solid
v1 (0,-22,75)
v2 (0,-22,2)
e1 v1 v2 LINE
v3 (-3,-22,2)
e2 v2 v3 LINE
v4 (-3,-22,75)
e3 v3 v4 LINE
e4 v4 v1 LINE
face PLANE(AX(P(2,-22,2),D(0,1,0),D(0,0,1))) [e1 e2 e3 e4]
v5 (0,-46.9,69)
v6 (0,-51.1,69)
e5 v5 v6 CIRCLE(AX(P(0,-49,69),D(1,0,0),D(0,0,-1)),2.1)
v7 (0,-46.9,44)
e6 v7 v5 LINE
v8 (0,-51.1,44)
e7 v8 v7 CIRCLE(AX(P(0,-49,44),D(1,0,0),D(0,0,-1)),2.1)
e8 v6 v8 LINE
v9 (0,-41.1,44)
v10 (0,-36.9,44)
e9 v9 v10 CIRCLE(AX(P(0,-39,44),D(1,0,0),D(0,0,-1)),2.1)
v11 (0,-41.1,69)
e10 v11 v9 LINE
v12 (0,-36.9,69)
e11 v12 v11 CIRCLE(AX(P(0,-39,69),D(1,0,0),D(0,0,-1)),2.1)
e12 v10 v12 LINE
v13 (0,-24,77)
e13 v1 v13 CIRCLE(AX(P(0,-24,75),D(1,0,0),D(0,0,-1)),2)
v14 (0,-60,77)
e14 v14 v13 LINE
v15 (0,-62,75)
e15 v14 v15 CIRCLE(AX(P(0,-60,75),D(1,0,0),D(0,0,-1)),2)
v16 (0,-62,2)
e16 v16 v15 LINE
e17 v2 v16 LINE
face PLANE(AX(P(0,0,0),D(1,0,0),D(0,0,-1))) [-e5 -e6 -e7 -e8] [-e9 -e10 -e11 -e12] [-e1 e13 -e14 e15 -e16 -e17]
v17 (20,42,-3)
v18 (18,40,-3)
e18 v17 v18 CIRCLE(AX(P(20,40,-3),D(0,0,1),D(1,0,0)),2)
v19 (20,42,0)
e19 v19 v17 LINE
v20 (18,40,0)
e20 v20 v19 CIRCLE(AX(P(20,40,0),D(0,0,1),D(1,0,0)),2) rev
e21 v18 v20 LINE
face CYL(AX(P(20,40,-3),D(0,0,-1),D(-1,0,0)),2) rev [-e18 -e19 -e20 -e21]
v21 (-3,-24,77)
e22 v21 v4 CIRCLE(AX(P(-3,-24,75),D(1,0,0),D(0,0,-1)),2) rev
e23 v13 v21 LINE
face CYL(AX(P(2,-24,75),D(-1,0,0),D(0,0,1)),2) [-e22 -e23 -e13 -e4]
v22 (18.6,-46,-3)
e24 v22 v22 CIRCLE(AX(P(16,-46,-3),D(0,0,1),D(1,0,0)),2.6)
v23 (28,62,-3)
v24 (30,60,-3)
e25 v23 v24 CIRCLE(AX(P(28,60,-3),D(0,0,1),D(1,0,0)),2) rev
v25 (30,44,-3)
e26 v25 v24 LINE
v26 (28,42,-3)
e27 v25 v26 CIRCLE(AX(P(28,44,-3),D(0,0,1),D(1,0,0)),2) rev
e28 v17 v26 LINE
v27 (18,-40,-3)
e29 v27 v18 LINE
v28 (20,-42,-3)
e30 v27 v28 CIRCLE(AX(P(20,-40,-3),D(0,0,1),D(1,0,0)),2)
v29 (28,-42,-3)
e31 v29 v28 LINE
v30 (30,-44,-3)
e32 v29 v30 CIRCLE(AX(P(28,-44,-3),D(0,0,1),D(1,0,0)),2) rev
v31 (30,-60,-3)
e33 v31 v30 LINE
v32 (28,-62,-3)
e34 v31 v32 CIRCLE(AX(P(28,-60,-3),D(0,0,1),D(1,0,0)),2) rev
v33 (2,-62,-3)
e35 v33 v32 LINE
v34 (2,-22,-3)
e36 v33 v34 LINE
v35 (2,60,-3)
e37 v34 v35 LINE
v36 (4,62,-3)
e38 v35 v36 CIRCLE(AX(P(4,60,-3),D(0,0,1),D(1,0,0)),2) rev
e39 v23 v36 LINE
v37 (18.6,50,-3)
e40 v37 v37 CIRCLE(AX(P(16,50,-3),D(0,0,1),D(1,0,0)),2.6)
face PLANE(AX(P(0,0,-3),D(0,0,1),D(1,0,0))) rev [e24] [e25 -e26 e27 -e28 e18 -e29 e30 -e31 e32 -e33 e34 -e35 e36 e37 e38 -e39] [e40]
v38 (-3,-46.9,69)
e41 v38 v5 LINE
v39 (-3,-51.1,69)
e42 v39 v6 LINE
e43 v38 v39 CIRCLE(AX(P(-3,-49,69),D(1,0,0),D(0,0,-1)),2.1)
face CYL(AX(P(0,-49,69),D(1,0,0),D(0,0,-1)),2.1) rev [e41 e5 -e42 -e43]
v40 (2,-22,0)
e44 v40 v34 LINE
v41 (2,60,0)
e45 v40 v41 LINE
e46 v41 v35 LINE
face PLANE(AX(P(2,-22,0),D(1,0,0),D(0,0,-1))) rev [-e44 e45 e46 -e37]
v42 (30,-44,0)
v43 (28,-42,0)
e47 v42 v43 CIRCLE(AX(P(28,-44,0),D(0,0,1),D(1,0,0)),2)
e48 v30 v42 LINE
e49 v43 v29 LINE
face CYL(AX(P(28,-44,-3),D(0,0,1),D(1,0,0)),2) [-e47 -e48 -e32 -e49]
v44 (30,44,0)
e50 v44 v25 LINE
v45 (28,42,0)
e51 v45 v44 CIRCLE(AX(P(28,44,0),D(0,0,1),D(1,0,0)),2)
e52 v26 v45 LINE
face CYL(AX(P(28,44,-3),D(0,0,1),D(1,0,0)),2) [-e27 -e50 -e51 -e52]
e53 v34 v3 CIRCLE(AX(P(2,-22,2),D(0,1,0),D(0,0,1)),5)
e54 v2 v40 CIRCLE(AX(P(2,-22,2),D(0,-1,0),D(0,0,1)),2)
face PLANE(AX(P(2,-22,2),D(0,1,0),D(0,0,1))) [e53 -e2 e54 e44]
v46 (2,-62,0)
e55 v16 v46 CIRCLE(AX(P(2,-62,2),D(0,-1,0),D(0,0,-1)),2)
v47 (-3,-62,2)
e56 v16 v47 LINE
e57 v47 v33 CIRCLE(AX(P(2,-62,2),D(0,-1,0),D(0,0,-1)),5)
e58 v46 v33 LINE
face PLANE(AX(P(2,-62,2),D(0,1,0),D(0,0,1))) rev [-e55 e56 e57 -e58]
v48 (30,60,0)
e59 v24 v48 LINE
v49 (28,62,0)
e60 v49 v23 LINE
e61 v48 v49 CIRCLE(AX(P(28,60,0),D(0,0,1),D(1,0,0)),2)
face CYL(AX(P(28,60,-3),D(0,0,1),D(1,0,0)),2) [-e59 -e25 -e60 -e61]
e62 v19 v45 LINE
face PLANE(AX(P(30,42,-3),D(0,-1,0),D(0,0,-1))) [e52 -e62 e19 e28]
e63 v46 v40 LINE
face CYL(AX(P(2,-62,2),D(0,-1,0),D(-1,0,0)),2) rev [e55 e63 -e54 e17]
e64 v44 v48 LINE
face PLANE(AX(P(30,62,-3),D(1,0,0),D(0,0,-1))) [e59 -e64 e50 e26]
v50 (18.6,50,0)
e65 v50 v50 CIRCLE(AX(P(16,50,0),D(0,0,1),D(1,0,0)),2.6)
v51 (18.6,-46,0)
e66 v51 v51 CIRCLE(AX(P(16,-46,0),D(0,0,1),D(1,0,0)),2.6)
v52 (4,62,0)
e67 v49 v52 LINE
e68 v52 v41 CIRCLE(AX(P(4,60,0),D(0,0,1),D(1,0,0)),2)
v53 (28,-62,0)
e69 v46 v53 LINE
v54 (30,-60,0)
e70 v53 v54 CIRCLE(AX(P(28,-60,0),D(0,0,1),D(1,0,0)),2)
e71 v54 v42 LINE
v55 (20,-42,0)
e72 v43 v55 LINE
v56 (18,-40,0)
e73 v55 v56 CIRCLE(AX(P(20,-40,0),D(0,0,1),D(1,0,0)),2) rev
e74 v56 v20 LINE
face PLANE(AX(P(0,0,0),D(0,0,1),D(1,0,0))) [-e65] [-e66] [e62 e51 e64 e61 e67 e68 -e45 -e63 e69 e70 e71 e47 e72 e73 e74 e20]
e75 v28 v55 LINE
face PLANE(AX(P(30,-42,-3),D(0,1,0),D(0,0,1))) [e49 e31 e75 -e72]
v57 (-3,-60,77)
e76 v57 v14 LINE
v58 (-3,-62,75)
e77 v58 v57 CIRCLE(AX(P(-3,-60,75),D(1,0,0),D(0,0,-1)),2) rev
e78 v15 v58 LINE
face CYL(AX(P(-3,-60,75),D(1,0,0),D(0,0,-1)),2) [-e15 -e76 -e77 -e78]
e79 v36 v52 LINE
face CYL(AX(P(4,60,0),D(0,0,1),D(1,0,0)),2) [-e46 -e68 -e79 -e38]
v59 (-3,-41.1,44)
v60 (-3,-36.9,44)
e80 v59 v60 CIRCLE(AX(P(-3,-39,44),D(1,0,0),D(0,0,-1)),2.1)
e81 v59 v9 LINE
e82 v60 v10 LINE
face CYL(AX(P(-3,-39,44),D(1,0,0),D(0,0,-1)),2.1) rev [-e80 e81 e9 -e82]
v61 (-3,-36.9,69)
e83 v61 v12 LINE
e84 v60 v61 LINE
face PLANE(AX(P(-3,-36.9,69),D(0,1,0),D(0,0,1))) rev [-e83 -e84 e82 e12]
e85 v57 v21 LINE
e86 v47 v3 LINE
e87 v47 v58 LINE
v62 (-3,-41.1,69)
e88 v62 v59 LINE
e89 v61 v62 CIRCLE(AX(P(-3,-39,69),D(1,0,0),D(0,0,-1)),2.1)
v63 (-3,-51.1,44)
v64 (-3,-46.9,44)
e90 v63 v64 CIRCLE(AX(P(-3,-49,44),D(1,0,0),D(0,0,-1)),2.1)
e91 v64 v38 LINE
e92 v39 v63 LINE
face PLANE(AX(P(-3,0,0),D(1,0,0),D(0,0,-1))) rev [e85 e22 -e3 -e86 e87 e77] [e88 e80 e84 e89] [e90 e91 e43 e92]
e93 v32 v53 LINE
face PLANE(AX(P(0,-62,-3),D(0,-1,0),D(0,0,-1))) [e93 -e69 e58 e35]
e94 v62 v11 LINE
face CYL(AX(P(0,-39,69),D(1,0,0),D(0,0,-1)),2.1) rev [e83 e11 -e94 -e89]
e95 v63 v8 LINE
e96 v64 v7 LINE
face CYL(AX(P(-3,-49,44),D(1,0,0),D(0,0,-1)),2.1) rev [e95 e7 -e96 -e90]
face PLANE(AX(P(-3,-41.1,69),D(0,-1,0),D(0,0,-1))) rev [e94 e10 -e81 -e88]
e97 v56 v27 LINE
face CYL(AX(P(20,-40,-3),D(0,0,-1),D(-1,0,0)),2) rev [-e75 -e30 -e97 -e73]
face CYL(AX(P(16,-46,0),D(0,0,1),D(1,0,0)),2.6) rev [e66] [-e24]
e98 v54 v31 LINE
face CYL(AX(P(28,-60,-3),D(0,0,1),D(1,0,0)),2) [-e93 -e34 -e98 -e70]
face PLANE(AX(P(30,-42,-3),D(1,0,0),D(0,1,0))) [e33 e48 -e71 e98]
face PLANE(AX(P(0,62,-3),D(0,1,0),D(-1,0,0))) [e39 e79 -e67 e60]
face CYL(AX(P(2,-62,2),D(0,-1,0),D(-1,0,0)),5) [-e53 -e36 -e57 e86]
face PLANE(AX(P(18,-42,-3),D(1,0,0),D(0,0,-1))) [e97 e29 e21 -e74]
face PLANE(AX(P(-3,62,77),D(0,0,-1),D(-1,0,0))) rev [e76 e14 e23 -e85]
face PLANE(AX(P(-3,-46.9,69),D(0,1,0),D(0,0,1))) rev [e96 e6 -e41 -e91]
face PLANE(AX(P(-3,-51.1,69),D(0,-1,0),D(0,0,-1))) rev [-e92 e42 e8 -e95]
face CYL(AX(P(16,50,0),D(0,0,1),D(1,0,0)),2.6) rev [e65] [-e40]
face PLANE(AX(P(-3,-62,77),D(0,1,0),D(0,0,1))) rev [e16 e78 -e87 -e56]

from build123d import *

# Parameters (mm, degrees)
ODGI_CIE_BAZOWE1_DEPTH             = 3
ODGI_CIE_KRAW_DZI1_STRIP_W         = 16
ODGI_CIE_KRAW_DZI1_STRIP_H         = 3
ODGI_CIE_KRAW_DZI1_STRIP_CUT_DEPTH = 124
ODGI_CIE_KRAW_DZI1_DEPTH           = 124
WYTNIJ_WYCI_GNI_CIE1_DEPTH         = 84
OTW_R_5_2_5_2_1_D                  = 5.2
OTW_R_4_2_4_2_1_D                  = 4.2
WYTNIJ_WYCI_GNI_CIE2_DEPTH         = 104.310212467
ZAOKR_GLENIE1_R                    = 2


# Sheet-metal steps are written as plain solids
with BuildPart() as part:
    # Szkic1 → Odgięcie bazowe1 (new body)
    with BuildSketch(Plane.XY):
        Polygon((30, -42), (30, -62), (0, -62), (0, 62), (30, 62), (30, 42), (18, 42), (18, -42), align=None)
    extrude(amount=-ODGI_CIE_BAZOWE1_DEPTH)

    # Odgięcie krawędzi1 strip (across the edge) → Odgięcie krawędzi1 strip cut (cut)
    with BuildSketch(Plane.XZ.offset(-62)):
        with Locations((-6, -1.5)):
            Rectangle(ODGI_CIE_KRAW_DZI1_STRIP_W, ODGI_CIE_KRAW_DZI1_STRIP_H)
    extrude(amount=ODGI_CIE_KRAW_DZI1_STRIP_CUT_DEPTH, mode=Mode.SUBTRACT)

    # Odgięcie krawędzi1 section (across the edge) → Odgięcie krawędzi1 (add)
    with BuildSketch(Plane.XZ.offset(-62)):
        with BuildLine():
            Line((-3, 2), (-3, 77))
            Line((-3, 77), (0, 77))
            Line((0, 77), (0, 2))
            ThreePointArc((0, 2), (0.585786438, 0.585786438), (2, 0))
            Line((2, 0), (2, -3))
            ThreePointArc((2, -3), (-1.535533906, -1.535533906), (-3, 2))
        make_face()
    extrude(amount=ODGI_CIE_KRAW_DZI1_DEPTH)

    # Szkic10 → Wytnij-wyciągnięcie1 (cut)
    with BuildSketch(Plane(origin=(0, 62, 0), x_dir=(1, 0, 0), z_dir=(0, 1, 0))):
        with BuildLine():
            Line((2, 0), (2, 3))
            ThreePointArc((2, 3), (-1.535533906, 1.535533906), (-3, -2))
            Line((-3, -2), (-3, -77))
            Line((-3, -77), (0, -77))
            Line((0, -77), (0, -2))
            ThreePointArc((0, -2), (0.585786438, -0.585786438), (2, 0))
        make_face()
    extrude(amount=-WYTNIJ_WYCI_GNI_CIE1_DEPTH, mode=Mode.SUBTRACT)

    # Otwór Ø5.2 (5.2)1 (through all)
    with Locations(Plane(origin=(16, -46, 0), x_dir=(1, 0, 0), z_dir=(0, 0, 1))):
        with Locations((0, 0), (0, 96)):
            Hole(OTW_R_5_2_5_2_1_D / 2)

    # Otwór Ø4.2 (4.2)1 (through all)
    with Locations(Plane(origin=(0, -49, 69), x_dir=(0, 0, 1), z_dir=(1, 0, 0))):
        with Locations((0, 0), (0, -10)):
            Hole(OTW_R_4_2_4_2_1_D / 2)

    # Szkic14 → Wytnij-wyciągnięcie2 (cut, through all)
    with BuildSketch(Plane(origin=(0, 0, 0), x_dir=(0, 0, -1), z_dir=(1, 0, 0))):
        with BuildLine():
            Line((-69, -46.9), (-44, -46.9))
            ThreePointArc((-44, -46.9), (-41.9, -49), (-44, -51.1))
            Line((-44, -51.1), (-69, -51.1))
            ThreePointArc((-69, -51.1), (-71.1, -49), (-69, -46.9))
        make_face()
        with BuildLine():
            Line((-69, -36.9), (-44, -36.9))
            ThreePointArc((-44, -36.9), (-41.9, -39), (-44, -41.1))
            Line((-44, -41.1), (-69, -41.1))
            ThreePointArc((-69, -41.1), (-71.1, -39), (-69, -36.9))
        make_face()
    extrude(amount=-WYTNIJ_WYCI_GNI_CIE2_DEPTH, mode=Mode.SUBTRACT)

    # Zaokrąglenie1
    zaokr_glenie1_edges = [part.edges().sort_by_distance(p)[0] for p in [
        (30, 62, -1.5),
        (30, 42, -1.5),
        (18, 42, -1.5),
        (18, -42, -1.5),
        (30, -42, -1.5),
        (30, -62, -1.5),
        (2, 62, -1.5),
        (-1.5, -62, 77),
        (-1.5, -22, 77),
    ]]
    fillet(zaokr_glenie1_edges, radius=ZAOKR_GLENIE1_R)


solid = part.part
